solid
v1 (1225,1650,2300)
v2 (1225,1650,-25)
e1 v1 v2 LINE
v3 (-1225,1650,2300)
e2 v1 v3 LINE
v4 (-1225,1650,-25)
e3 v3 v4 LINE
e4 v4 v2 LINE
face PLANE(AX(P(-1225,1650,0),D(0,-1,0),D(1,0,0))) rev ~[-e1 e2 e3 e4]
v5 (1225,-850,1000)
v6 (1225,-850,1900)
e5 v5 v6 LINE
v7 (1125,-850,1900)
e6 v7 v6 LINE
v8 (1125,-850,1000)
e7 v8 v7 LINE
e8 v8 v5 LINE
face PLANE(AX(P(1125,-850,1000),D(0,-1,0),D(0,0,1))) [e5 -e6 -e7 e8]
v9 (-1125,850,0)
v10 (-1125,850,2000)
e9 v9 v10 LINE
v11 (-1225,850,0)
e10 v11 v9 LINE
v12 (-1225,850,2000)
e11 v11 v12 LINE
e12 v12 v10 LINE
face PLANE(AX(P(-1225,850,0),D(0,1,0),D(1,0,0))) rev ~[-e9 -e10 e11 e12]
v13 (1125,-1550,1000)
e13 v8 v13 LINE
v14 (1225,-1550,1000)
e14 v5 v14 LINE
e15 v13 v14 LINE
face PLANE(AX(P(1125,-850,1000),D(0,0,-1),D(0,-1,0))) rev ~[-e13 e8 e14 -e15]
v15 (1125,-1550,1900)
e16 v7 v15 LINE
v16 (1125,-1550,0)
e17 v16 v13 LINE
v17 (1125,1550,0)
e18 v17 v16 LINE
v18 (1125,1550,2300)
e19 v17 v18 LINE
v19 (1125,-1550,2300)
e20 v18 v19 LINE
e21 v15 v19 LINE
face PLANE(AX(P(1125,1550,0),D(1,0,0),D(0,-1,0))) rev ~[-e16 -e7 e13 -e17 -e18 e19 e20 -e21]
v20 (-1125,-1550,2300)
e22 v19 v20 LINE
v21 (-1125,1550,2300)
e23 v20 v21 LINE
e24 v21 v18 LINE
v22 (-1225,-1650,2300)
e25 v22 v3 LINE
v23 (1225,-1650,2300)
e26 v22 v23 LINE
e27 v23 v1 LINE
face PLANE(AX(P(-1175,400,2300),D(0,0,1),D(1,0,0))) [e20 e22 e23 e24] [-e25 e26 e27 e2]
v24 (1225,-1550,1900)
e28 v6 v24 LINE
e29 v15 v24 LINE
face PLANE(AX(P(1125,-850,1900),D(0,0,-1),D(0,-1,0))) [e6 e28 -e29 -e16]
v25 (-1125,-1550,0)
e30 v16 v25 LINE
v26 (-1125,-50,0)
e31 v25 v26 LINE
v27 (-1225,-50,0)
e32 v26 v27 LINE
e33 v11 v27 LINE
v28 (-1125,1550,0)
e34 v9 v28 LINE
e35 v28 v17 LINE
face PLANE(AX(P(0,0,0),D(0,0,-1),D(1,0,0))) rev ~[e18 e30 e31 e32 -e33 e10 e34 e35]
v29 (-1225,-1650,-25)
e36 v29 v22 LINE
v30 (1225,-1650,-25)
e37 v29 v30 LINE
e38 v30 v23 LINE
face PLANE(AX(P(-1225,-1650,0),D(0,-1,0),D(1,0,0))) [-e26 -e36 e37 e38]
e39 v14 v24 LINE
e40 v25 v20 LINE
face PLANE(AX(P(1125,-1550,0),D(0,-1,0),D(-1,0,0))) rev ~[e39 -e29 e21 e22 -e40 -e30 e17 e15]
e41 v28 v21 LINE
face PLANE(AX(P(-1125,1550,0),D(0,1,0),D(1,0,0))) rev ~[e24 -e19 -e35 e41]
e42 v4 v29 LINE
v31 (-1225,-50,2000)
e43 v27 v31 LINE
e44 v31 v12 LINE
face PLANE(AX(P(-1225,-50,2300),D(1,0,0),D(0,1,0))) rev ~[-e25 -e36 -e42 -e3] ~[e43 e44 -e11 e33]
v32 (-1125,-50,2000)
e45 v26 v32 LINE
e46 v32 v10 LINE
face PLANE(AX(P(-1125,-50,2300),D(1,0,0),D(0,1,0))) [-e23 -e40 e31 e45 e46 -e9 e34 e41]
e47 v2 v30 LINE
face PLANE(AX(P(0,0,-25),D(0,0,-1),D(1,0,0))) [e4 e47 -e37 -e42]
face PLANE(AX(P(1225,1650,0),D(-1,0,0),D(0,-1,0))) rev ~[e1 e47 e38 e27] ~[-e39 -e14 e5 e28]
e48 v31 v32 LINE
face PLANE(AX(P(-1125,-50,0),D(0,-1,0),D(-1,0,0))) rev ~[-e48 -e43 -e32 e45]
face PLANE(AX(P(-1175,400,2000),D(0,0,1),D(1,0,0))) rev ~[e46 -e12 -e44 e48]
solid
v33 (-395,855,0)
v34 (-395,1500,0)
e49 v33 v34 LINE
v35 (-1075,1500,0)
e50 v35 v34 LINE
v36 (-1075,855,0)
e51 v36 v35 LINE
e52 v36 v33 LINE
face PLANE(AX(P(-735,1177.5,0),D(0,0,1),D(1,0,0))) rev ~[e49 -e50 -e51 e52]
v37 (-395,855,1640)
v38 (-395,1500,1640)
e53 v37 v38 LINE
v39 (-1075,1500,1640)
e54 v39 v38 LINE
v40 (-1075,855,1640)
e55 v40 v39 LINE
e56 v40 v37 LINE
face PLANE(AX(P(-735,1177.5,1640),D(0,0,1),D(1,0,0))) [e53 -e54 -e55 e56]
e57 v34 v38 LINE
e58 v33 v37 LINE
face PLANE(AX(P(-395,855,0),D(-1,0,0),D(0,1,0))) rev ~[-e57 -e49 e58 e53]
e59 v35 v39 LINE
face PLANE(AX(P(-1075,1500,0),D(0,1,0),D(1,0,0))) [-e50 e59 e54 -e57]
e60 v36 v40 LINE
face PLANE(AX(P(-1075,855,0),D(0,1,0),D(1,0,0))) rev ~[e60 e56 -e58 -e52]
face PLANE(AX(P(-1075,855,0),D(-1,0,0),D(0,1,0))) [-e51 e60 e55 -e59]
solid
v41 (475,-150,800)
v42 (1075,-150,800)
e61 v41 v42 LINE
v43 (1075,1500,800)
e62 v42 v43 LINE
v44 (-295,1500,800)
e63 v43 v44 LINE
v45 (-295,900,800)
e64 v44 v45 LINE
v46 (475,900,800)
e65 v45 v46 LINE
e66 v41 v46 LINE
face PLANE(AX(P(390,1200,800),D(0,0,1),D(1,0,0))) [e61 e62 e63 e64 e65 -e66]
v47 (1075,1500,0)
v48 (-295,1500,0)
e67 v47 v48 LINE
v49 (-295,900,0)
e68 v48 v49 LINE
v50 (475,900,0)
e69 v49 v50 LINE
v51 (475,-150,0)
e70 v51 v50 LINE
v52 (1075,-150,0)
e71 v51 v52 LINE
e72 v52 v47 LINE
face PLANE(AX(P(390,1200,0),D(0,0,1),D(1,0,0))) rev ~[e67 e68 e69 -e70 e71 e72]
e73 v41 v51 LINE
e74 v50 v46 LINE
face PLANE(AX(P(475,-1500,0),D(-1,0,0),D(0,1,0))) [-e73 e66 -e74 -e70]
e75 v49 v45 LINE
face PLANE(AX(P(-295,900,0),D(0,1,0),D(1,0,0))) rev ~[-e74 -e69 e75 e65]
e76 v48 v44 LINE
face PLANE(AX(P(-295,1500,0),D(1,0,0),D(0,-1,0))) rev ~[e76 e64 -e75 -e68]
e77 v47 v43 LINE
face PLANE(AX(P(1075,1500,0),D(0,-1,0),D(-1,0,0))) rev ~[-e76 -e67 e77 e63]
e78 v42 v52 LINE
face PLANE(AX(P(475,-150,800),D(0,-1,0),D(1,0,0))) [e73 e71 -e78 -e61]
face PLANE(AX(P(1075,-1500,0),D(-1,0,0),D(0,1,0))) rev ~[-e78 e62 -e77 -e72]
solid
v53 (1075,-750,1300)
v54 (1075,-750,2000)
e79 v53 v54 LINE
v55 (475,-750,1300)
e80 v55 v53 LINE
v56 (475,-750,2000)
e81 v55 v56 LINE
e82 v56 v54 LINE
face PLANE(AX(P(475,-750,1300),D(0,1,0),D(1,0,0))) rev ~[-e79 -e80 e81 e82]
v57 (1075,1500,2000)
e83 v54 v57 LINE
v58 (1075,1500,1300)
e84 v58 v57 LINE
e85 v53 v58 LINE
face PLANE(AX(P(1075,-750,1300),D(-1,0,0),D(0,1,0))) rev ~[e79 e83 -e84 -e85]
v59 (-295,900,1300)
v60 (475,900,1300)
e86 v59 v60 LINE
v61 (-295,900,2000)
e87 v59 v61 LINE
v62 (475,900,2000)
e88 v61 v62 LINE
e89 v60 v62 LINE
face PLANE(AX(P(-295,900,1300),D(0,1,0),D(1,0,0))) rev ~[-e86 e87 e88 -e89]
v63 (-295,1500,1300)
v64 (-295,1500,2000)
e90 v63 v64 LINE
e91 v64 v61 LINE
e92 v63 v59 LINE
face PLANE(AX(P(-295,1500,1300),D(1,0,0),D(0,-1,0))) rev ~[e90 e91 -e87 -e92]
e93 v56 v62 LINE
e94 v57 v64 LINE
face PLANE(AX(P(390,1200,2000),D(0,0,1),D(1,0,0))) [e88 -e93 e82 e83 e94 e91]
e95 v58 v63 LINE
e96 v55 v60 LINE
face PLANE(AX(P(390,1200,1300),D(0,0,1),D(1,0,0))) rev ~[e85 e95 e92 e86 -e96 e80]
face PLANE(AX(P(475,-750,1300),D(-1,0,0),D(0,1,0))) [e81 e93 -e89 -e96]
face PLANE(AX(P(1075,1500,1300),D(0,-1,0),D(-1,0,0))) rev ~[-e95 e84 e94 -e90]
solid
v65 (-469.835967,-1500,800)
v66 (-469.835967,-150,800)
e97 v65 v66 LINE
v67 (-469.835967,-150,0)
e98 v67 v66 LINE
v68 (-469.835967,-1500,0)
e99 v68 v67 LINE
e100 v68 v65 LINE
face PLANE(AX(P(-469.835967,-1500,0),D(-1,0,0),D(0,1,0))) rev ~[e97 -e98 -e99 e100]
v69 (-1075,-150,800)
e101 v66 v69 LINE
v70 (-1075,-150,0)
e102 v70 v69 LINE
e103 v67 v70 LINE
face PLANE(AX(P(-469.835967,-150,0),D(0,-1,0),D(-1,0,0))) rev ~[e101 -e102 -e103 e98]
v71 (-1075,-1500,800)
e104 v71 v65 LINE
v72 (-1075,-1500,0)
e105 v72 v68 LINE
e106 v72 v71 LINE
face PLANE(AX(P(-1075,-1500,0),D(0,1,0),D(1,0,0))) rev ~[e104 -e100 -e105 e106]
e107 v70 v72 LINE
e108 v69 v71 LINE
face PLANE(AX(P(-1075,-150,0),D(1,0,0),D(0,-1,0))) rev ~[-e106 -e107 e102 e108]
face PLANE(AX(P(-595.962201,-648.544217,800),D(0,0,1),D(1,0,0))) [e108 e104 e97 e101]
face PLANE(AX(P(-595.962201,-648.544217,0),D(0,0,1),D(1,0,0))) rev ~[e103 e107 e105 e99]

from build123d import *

# Parameters (mm, degrees)
F1_DEPTH  = 2300
F2_W      = 700
F2_H      = 900
F3_DEPTH  = 512.67833
F4_W      = 2450
F4_H      = 3300
F5_DEPTH  = 25
F6_W      = 100
F6_H      = 900
F7_DEPTH  = 300
F8_W      = 680
F8_H      = 645
F9_DEPTH  = 1640
F10_W     = 600
F10_H     = 2400
F11_DEPTH = 800
F13_W     = 600
F13_H     = 1650
F14_DEPTH = 700
F15_W     = 600
F15_H     = 1150
F16_DEPTH = 800
F19_W     = 600
F19_H     = 1350
F20_DEPTH = 800


# Not quite as in the source:
# - a feature of the source that left no trace in its solid (it failed there, or was rolled back) is left out


with BuildPart() as f1:
    # F0 (on Top) → F1 (new body)
    with BuildSketch(Plane.XY):
        Polygon((-1125, 1550), (1125, 1550), (1125, -1550), (-1125, -1550), (-1125, -50), (-1225, -50), (-1225, -1650), (1225, -1650), (1225, 1650), (-1225, 1650), (-1225, 850), (-1125, 850), align=None)
    extrude(amount=F1_DEPTH)

    # F2 (on face) → F3 (cut)
    with BuildSketch(Plane(origin=(1125, 0, 0), x_dir=(0, -1, 0), z_dir=(-1, 0, 0))):
        with Locations((1200, 1450)):
            Rectangle(F2_W, F2_H)
    extrude(amount=-F3_DEPTH, mode=Mode.SUBTRACT)

    # F4 (on face) → F5 (join)
    with BuildSketch(Plane(origin=(0, 0, 0), x_dir=(1, 0, 0), z_dir=(0, 0, -1))):
        Rectangle(F4_W, F4_H)
    extrude(amount=F5_DEPTH)

    # F6 (on face) → F7 (join)
    with BuildSketch(Plane.XY.offset(2300)):
        with Locations((-1175, 400)):
            Rectangle(F6_W, F6_H)
    extrude(amount=-F7_DEPTH)


with BuildPart() as f9:
    # F8 (on face) → F9 (new body)
    with BuildSketch(Plane.XY):
        with Locations((-735, 1177.5)):
            Rectangle(F8_W, F8_H)
    extrude(amount=F9_DEPTH)


with BuildPart() as f11:
    # F10 (on face) → F11 (new body)
    with BuildSketch(Plane.XY):
        Polygon((1075, 1500), (-295, 1500), (-295, 900), (475, 900), (1075, 900), align=None)
        with Locations((775, -300)):
            Rectangle(F10_W, F10_H)
    extrude(amount=F11_DEPTH)

    # F19 (on face) → F20 (cut)
    with BuildSketch(Plane.XY.offset(800)):
        with Locations((775, -825)):
            Rectangle(F19_W, F19_H)
    extrude(amount=-F20_DEPTH, mode=Mode.SUBTRACT)


with BuildPart() as f14:
    # F13 (on offset) → F14 (new body)
    with BuildSketch(Plane.XY.offset(1300)):
        Polygon((1075, 900), (1075, 1500), (-295, 1500), (-295, 900), (475, 900), align=None)
        with Locations((775, 75)):
            Rectangle(F13_W, F13_H)
    extrude(amount=F14_DEPTH)


with BuildPart() as f16:
    # F15 (on face) → F16 (new body)
    with BuildSketch(Plane.XY):
        Polygon((-1075, -150), (-1075, -350), (-475, -350), (-475, -1500), (-469.8359668255, -1500), (-469.8359668255, -150), align=None)
        with Locations((-775, -925)):
            Rectangle(F15_W, F15_H)
    extrude(amount=F16_DEPTH)


solid = Compound([f1.part, f9.part, f11.part, f14.part, f16.part])
